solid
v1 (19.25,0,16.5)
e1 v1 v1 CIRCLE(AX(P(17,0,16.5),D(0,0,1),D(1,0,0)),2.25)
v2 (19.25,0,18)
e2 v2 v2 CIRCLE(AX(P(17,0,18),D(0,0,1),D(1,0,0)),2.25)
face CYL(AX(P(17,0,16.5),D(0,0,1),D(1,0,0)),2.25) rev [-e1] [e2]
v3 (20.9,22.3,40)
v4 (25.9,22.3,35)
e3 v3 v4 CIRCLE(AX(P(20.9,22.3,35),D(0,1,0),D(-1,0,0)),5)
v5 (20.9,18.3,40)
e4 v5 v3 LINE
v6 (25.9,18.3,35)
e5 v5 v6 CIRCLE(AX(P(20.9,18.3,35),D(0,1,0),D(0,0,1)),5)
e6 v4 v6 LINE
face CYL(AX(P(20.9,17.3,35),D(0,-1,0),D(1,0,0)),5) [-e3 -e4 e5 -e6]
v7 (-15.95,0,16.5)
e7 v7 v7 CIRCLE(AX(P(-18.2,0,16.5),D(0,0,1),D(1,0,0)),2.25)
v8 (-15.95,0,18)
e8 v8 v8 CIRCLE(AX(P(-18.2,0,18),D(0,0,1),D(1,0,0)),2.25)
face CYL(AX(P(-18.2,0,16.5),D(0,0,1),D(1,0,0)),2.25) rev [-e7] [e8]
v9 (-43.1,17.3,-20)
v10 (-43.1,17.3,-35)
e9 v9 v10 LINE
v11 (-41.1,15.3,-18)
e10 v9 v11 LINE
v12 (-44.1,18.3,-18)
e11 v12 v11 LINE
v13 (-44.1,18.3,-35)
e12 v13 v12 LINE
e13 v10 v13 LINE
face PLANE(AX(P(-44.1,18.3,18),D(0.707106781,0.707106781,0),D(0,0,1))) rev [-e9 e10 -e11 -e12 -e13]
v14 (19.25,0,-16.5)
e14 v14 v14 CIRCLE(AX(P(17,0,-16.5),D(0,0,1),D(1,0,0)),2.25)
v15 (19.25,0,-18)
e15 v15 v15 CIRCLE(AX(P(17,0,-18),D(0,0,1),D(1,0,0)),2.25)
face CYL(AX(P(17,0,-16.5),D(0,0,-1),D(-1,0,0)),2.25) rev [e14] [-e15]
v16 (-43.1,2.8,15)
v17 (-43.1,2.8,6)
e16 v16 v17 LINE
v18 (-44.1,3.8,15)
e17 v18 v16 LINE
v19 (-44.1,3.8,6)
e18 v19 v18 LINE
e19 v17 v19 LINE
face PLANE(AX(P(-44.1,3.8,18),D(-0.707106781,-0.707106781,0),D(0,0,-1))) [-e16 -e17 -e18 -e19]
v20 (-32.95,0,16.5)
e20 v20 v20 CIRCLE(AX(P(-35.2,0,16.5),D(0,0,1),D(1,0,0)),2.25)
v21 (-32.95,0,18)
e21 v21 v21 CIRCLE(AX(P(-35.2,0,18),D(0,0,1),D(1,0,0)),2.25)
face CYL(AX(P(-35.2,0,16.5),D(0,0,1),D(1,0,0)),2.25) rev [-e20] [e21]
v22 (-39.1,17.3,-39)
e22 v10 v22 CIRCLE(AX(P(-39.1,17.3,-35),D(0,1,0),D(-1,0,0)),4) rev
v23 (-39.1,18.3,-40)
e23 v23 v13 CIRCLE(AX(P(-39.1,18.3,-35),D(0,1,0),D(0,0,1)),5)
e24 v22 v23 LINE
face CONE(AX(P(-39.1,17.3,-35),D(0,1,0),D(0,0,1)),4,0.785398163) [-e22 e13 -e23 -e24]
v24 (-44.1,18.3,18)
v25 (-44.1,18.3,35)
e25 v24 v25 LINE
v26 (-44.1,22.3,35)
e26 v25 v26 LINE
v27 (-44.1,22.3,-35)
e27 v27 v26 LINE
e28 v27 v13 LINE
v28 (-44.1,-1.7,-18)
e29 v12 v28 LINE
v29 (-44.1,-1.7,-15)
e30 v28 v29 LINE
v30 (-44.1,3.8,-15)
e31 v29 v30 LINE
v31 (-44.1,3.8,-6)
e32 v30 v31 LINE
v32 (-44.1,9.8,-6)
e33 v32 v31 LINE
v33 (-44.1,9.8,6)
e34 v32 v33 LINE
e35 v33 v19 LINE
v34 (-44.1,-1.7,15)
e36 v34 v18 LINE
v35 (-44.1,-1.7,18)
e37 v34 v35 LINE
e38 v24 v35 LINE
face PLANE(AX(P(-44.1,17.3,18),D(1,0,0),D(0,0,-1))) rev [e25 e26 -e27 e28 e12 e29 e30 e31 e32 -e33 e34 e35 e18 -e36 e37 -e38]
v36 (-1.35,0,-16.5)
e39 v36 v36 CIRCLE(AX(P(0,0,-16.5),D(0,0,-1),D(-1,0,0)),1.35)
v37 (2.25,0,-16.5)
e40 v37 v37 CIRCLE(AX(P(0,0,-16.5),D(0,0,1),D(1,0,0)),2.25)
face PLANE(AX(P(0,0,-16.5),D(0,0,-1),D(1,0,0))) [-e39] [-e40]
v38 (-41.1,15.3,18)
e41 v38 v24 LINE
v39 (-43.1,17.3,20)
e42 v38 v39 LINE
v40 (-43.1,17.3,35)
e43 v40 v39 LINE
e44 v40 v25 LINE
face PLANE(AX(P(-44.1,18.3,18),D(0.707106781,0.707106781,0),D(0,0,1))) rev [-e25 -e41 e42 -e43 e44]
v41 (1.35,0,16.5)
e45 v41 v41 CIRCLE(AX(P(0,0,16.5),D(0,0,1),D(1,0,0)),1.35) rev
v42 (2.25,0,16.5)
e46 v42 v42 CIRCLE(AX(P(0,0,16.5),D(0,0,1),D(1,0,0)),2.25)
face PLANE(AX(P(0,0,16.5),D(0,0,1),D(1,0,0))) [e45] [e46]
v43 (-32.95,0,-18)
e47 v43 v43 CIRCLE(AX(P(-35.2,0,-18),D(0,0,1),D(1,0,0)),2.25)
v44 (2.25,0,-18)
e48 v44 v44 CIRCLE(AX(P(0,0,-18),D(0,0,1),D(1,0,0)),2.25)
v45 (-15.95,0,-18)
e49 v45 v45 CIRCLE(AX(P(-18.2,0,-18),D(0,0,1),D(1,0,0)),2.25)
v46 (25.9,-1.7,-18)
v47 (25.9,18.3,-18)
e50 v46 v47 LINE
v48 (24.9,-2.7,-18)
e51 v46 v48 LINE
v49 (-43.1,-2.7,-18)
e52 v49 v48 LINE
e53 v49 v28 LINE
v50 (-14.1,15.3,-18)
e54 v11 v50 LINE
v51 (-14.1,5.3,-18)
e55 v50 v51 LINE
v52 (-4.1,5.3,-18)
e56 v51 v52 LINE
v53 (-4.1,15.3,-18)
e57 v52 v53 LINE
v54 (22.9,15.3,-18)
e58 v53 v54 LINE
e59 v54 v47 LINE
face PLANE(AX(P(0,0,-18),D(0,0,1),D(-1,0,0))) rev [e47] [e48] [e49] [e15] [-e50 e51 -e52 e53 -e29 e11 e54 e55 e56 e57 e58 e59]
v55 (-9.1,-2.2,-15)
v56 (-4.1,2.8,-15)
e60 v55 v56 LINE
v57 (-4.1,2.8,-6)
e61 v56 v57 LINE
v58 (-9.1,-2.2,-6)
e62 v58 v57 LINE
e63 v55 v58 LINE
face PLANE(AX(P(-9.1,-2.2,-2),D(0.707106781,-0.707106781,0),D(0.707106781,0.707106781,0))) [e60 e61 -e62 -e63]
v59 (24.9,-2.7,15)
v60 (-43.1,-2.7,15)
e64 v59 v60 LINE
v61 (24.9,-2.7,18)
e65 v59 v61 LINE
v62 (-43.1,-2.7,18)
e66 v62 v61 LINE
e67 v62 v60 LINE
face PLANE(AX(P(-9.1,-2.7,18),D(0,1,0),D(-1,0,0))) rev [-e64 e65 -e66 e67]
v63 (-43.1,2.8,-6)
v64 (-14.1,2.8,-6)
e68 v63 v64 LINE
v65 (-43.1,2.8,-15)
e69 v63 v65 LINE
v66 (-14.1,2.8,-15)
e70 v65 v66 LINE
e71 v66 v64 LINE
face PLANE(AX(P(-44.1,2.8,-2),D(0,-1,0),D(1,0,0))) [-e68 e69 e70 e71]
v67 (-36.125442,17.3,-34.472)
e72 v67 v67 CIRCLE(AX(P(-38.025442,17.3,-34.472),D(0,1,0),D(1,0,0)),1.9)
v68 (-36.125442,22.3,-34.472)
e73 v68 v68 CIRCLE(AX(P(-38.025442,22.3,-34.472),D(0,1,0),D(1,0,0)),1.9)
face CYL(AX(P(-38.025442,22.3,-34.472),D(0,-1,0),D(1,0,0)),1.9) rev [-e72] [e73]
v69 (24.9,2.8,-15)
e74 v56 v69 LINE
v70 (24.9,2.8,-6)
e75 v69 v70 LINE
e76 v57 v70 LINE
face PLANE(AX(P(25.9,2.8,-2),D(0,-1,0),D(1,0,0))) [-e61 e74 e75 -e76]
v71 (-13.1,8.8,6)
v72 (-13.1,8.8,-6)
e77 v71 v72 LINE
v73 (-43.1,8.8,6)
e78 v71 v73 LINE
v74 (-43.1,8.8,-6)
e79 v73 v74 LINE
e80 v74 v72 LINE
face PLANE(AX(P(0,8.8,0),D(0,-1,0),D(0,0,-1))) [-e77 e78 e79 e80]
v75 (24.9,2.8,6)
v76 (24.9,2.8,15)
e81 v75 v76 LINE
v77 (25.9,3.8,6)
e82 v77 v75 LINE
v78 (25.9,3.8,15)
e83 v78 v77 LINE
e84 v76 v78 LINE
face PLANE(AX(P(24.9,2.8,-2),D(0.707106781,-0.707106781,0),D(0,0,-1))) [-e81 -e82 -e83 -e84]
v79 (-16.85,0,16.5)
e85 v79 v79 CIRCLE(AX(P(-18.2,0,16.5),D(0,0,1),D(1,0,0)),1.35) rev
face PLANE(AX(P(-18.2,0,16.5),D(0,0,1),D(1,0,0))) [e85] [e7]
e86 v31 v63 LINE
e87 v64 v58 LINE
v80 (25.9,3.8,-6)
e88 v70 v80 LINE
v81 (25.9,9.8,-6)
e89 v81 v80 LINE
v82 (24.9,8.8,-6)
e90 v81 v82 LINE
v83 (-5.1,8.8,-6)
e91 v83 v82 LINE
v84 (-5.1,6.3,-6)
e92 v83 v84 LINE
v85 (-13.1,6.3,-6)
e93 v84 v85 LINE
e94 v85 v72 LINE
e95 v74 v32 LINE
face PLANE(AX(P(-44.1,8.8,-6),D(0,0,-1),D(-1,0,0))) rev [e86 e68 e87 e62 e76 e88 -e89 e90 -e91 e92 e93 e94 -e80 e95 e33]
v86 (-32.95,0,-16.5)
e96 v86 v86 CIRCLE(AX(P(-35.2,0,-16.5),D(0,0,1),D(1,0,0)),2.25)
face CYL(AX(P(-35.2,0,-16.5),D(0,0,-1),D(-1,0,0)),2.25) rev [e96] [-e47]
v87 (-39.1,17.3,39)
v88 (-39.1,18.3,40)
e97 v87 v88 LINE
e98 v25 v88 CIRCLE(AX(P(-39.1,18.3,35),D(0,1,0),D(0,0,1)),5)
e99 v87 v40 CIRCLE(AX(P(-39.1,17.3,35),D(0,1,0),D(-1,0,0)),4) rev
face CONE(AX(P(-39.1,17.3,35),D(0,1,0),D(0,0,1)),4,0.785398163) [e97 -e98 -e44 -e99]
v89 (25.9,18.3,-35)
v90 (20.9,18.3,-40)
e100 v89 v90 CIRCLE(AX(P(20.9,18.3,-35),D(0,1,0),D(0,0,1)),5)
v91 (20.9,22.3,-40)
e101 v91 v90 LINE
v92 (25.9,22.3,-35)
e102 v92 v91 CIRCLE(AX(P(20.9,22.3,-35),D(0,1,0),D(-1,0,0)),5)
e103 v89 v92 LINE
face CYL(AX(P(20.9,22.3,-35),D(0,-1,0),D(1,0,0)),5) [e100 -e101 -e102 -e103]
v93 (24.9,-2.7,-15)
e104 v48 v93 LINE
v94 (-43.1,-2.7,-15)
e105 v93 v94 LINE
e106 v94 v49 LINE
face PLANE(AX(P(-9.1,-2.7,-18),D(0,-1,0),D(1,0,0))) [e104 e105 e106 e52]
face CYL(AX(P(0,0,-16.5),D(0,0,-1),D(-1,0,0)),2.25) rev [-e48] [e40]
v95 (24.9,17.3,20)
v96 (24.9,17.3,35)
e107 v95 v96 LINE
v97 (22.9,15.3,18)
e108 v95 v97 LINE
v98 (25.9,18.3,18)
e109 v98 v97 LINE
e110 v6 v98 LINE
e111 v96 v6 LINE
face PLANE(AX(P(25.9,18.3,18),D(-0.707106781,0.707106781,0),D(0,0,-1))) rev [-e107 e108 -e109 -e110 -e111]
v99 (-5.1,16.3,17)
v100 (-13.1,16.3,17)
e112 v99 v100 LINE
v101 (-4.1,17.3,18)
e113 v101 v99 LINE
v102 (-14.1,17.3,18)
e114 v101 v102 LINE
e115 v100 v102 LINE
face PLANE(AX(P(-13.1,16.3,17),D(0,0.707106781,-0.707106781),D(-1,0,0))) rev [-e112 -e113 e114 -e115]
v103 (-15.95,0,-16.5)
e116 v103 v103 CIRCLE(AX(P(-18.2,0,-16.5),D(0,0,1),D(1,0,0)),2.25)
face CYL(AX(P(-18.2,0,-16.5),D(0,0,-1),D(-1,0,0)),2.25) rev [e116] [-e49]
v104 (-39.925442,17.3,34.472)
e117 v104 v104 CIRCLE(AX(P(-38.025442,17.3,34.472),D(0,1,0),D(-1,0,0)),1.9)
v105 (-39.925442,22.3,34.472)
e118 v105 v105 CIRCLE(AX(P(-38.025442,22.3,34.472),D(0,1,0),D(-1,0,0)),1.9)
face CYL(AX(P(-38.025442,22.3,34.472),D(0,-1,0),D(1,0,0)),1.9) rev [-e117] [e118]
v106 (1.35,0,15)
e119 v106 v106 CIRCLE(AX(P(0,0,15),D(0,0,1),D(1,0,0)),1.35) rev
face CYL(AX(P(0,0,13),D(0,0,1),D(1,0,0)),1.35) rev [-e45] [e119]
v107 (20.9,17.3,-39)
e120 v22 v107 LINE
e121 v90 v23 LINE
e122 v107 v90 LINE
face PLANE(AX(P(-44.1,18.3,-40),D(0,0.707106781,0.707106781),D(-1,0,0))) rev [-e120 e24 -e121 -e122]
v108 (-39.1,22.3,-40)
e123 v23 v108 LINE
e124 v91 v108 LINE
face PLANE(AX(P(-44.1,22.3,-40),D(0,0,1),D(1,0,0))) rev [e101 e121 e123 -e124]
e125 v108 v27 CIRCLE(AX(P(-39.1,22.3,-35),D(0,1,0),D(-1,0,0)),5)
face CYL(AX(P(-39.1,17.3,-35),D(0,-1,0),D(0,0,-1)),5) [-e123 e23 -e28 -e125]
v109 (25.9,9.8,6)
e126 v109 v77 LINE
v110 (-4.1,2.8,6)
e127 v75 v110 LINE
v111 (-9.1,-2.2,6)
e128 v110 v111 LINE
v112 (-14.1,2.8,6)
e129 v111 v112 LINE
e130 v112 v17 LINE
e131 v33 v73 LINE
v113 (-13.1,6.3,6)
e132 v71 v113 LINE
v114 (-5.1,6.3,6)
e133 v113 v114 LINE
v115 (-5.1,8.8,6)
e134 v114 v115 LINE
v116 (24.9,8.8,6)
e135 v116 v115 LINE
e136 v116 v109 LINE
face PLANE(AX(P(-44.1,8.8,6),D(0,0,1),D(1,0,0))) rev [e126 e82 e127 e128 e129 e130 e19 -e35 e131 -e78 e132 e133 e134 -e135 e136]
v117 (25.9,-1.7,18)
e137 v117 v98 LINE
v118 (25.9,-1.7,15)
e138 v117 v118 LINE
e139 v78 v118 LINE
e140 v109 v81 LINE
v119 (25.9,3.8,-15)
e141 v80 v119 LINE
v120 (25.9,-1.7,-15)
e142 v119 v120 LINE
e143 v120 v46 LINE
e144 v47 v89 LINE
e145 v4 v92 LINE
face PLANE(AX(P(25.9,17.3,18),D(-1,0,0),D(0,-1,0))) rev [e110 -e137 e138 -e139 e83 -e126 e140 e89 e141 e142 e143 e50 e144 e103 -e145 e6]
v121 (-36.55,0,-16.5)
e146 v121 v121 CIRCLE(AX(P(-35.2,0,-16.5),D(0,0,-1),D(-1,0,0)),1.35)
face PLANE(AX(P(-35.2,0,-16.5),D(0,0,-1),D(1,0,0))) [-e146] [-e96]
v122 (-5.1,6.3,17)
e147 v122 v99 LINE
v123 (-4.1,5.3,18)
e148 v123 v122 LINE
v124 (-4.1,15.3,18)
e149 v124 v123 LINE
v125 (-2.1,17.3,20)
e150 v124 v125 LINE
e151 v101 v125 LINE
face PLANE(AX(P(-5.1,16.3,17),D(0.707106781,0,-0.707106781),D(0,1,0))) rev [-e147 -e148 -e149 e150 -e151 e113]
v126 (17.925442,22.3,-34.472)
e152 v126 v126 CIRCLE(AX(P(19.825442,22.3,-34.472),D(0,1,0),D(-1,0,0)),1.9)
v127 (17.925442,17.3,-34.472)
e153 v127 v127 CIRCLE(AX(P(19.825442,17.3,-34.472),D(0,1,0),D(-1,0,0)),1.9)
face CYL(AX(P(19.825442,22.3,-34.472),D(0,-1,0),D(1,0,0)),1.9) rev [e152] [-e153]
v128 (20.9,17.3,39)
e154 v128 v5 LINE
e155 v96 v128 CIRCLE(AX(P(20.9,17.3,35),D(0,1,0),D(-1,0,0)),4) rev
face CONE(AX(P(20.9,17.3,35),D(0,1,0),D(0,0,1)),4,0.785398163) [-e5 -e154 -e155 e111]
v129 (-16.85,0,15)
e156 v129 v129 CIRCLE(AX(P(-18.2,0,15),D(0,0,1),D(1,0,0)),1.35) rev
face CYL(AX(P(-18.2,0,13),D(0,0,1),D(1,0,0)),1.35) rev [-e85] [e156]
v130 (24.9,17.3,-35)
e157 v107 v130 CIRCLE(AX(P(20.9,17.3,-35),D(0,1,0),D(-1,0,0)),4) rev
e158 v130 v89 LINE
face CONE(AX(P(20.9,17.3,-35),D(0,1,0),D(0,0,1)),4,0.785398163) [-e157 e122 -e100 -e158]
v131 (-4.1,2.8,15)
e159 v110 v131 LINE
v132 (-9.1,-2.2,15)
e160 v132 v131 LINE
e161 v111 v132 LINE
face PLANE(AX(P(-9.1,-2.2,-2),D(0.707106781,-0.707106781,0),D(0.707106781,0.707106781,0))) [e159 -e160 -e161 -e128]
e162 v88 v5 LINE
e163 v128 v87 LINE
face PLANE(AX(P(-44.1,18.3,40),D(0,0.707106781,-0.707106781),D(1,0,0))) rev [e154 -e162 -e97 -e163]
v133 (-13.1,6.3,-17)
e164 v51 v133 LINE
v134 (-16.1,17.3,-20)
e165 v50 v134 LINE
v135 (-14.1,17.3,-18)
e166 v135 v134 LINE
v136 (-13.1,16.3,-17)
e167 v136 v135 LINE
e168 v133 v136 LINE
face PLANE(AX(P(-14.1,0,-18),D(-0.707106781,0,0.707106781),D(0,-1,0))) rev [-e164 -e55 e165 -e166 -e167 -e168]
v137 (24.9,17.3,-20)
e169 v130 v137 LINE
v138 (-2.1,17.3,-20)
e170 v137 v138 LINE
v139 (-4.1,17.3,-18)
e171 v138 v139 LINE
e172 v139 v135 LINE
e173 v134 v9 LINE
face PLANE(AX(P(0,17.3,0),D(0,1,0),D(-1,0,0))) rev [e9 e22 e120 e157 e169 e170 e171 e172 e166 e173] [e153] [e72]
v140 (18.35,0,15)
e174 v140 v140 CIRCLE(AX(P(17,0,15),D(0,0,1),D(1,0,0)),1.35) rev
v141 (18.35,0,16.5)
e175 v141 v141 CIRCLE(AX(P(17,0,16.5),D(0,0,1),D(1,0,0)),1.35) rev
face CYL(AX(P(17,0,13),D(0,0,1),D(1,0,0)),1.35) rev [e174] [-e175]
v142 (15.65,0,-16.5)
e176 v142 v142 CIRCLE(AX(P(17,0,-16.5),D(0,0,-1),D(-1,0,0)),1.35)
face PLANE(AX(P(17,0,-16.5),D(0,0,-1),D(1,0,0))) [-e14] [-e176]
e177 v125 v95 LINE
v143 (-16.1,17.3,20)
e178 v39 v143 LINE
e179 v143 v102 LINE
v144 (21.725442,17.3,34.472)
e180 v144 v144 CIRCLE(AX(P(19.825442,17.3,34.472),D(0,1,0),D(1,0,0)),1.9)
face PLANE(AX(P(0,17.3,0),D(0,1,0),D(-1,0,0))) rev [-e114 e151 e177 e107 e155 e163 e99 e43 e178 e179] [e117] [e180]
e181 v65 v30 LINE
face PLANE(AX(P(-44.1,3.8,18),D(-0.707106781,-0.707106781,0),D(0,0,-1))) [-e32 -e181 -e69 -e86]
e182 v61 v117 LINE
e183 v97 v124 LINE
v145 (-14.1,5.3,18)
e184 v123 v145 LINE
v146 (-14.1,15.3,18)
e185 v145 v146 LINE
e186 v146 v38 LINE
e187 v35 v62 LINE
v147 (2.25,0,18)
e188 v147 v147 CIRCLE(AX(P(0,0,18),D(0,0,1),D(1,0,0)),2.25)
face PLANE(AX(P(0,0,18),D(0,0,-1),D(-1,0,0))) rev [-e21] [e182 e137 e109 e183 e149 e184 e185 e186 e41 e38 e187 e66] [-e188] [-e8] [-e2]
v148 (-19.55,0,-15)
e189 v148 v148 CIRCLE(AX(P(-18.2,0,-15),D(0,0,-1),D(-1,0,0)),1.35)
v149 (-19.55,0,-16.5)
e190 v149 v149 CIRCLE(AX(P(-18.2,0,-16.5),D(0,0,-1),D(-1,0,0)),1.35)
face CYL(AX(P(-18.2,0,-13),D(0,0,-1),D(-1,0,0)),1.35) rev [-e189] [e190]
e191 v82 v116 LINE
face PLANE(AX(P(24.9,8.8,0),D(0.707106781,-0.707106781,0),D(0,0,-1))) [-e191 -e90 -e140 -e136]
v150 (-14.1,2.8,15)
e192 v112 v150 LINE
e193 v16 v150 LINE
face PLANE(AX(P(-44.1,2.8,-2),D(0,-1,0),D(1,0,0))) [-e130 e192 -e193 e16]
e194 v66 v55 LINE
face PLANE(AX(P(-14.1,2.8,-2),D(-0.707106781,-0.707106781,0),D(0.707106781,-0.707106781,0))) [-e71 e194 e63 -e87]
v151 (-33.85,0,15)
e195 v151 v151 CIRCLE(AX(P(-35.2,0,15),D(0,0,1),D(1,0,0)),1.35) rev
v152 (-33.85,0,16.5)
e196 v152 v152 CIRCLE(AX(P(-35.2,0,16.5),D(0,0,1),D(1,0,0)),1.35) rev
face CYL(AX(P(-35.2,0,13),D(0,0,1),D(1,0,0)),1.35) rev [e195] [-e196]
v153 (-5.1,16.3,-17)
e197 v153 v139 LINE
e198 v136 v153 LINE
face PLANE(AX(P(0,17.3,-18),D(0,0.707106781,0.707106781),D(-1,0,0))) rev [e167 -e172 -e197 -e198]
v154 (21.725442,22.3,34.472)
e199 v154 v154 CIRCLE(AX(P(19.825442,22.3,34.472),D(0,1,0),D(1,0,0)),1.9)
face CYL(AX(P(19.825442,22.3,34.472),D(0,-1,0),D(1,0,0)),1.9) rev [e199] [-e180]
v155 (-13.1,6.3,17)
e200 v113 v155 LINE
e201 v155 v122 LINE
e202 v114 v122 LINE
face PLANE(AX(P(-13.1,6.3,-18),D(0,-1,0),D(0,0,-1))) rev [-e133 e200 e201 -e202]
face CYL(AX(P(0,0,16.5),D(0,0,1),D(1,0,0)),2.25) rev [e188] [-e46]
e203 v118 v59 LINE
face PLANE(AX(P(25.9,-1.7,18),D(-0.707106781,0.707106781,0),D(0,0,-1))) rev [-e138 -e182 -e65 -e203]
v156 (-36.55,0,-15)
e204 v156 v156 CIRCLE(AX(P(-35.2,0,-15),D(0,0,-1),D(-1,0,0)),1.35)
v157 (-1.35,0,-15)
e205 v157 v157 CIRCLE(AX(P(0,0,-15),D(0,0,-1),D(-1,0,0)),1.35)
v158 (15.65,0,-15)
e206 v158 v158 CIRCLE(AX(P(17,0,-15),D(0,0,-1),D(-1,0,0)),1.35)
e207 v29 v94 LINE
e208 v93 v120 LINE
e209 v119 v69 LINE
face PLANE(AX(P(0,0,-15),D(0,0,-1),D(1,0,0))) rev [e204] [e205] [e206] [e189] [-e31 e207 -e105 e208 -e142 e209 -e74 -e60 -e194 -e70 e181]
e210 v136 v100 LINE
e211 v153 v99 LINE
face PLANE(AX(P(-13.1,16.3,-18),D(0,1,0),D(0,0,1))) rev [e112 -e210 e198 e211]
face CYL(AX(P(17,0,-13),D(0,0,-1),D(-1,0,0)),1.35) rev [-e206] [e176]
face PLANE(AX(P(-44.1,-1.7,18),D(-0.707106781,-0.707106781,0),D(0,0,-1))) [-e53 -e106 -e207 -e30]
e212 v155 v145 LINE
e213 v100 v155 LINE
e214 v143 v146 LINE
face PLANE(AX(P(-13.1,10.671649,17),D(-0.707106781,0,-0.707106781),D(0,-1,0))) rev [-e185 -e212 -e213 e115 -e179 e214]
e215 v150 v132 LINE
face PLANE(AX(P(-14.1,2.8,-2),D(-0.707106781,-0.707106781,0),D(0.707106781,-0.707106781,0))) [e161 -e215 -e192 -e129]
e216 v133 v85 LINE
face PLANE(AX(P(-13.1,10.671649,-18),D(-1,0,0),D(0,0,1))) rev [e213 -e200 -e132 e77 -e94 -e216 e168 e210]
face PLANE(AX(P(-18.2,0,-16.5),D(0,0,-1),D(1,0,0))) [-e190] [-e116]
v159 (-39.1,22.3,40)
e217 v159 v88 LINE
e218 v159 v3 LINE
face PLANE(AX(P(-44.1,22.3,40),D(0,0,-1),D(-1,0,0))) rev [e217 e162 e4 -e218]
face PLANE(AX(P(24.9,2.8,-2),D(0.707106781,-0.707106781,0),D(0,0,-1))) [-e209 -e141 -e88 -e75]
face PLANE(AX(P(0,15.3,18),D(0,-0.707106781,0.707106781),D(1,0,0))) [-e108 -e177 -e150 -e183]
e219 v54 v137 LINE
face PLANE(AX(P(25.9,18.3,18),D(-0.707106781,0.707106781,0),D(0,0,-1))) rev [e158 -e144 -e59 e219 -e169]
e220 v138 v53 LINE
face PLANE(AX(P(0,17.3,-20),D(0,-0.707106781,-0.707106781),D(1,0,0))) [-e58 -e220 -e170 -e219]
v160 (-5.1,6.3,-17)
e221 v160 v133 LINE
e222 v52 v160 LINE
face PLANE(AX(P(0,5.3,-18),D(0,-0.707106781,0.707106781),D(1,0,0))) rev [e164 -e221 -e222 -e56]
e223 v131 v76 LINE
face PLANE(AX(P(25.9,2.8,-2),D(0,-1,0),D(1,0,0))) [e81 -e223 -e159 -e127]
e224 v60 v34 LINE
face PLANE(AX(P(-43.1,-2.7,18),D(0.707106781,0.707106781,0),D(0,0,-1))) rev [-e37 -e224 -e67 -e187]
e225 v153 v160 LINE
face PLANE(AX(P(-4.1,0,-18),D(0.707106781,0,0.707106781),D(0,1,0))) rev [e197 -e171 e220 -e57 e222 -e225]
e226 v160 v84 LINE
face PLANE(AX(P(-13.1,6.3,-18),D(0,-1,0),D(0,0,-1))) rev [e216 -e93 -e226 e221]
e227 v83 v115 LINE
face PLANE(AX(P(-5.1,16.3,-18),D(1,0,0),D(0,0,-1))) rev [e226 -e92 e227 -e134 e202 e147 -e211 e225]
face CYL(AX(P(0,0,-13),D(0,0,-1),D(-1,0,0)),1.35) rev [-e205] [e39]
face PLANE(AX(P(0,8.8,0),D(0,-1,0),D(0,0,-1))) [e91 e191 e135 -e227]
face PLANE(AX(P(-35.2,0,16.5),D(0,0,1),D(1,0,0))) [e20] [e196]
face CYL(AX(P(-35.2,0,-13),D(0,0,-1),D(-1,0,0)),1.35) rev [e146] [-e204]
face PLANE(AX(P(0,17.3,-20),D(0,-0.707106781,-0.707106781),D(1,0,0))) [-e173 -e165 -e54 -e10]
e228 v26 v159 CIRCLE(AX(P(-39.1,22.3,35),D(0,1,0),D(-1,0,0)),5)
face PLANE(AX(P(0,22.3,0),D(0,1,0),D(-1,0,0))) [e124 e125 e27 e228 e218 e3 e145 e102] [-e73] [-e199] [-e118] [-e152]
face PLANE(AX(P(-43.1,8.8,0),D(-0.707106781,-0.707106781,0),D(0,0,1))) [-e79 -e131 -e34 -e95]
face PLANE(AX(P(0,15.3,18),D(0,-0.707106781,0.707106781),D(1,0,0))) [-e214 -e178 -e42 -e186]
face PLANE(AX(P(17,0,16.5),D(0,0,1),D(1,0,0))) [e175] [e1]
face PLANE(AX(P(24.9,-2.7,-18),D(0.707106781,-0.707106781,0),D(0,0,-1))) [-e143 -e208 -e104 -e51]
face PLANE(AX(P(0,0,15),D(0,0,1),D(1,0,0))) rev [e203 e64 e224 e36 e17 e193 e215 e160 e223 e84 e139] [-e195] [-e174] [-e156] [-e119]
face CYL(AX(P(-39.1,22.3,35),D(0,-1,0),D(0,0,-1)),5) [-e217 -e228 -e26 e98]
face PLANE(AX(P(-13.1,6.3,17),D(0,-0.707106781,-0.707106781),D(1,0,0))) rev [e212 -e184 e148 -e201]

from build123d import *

# Parameters (mm, degrees)
BOSS_EXTRUDE1_DEPTH        = 18
CROQUIS2_R                 = 1.35
CORTAR_EXTRUIR2_DEPTH      = 5
SKETCH3_R                  = 2.25
CUT_EXTRUDE1_DEPTH         = 1.5
CORTAR_EXTRUIR3_START      = 3
CORTAR_EXTRUIR3_DEPTH      = 17
CORTAR_EXTRUIR4_DEPTH      = 50.79015967
CORTAR_EXTRUIR4_DEPTH_BACK = 6
CROQUIS4_W                 = 70
CROQUIS4_H                 = 12
CORTAR_EXTRUIR11_DEPTH     = 60.498739482
CROQUIS6_W                 = 70
CROQUIS6_H                 = 80
CROQUIS6_R                 = 1.9
SALIENTE_EXTRUIR1_DEPTH    = 5
REDONDEO1_R                = 5
CHAFL_N1_SIZE              = 1
CHAFL_N2_SIZE              = 1
CHAFL_N3_SIZE              = 1
CHAFL_N5_SIZE              = 1
CHAFL_N6_SIZE              = 2


# Some blends are built 0.0001 mm under size
with BuildPart() as part:
    # Sketch1 → Boss-Extrude1 (new body)
    with BuildSketch(Plane.XY):
        Polygon((25.9, 17.3), (-9.1, 17.3), (-44.1, 17.3), (-44.1, -2.7), (-9.1, -2.7), (25.9, -2.7), (25.9, 2.5), align=None)
    boss_extrude1 = extrude(amount=BOSS_EXTRUDE1_DEPTH)

    # Croquis2 → Cortar-Extruir2 (cut)
    with BuildSketch(Plane.XY.offset(18)):
        Circle(CROQUIS2_R)
        with Locations((17, 0)):
            Circle(CROQUIS2_R)
        with Locations((-18.2, 0)):
            Circle(CROQUIS2_R)
        with Locations((-35.2, 0)):
            Circle(CROQUIS2_R)
    cortar_extruir2 = extrude(amount=-CORTAR_EXTRUIR2_DEPTH, mode=Mode.SUBTRACT)

    # Sketch3 → Cut-Extrude1 (cut)
    with BuildSketch(Plane.XY.offset(18)):
        Circle(SKETCH3_R)
        with Locations((17, 0)):
            Circle(SKETCH3_R)
        with Locations((-18.2, 0)):
            Circle(SKETCH3_R)
        with Locations((-35.2, 0)):
            Circle(SKETCH3_R)
    cut_extrude1 = extrude(amount=-CUT_EXTRUDE1_DEPTH, mode=Mode.SUBTRACT)

    # Croquis3 → Cortar-Extruir3 (cut)
    with BuildSketch(Plane(origin=(0, 0, 18), x_dir=(-1, 0, 0), z_dir=(0, 0, -1)).offset(CORTAR_EXTRUIR3_START)):
        Polygon((-25.9, -2.7), (-25.9, 2.8), (4.1, 2.8), (9.1, -2.2), (14.1, 2.8), (44.1, 2.8), (44.1, -2.7), align=None)
    cortar_extruir3 = extrude(amount=CORTAR_EXTRUIR3_DEPTH, mode=Mode.SUBTRACT)

    # Mirror1: Boss-Extrude1, Cortar-Extruir2, Cut-Extrude1, Cortar-Extruir3 across plane
    add(boss_extrude1.mirror(Plane(origin=(0, 0, 0), x_dir=(1, 0, 0), z_dir=(0, 0, -1))))
    add(cortar_extruir2.mirror(Plane(origin=(0, 0, 0), x_dir=(1, 0, 0), z_dir=(0, 0, -1))), mode=Mode.SUBTRACT)
    add(cut_extrude1.mirror(Plane(origin=(0, 0, 0), x_dir=(1, 0, 0), z_dir=(0, 0, -1))), mode=Mode.SUBTRACT)
    add(cortar_extruir3.mirror(Plane(origin=(0, 0, 0), x_dir=(1, 0, 0), z_dir=(0, 0, -1))), mode=Mode.SUBTRACT)

    # Croquis4 → Cortar-Extruir4 (cut, two sides: drawn at the far end of the back side and taken through both)
    with BuildSketch(Plane.XZ.offset(-2.8).offset(-CORTAR_EXTRUIR4_DEPTH_BACK)):
        with Locations((-9.1, 0)):
            Rectangle(CROQUIS4_W, CROQUIS4_H)
    extrude(amount=CORTAR_EXTRUIR4_DEPTH + CORTAR_EXTRUIR4_DEPTH_BACK, mode=Mode.SUBTRACT)

    # Croquis5 → Cortar-Extruir11 (cut, through all)
    with BuildSketch(Plane.XY.offset(18)):
        Polygon((-13.1, 10.671649133), (-13.1, 16.3), (-5.1, 16.3), (-5.1, 11.3), (-5.1, 6.3), (-13.1, 6.3), align=None)
    extrude(amount=-CORTAR_EXTRUIR11_DEPTH, mode=Mode.SUBTRACT)

    # Croquis6 → Saliente-Extruir1 (add)
    with BuildSketch(Plane(origin=(0, 17.3, 0), x_dir=(1, 0, 0), z_dir=(0, 1, 0))):
        with Locations((-9.1, 0)):
            Rectangle(CROQUIS6_W, CROQUIS6_H)
        with Locations(Location((-38.025442436, -34.47199994, 0), (0, 0, 180))):
            Circle(CROQUIS6_R, mode=Mode.SUBTRACT)
        with Locations((19.825442436, -34.47199994)):
            Circle(CROQUIS6_R, mode=Mode.SUBTRACT)
        with Locations(Location((19.825442436, 34.47199994, 0), (0, 0, 180))):
            Circle(CROQUIS6_R, mode=Mode.SUBTRACT)
        with Locations((-38.025442436, 34.47199994)):
            Circle(CROQUIS6_R, mode=Mode.SUBTRACT)
    extrude(amount=SALIENTE_EXTRUIR1_DEPTH)

    # Redondeo1
    redondeo1_edges = [part.edges().sort_by_distance(p)[0] for p in [
        (25.9, 19.8, 40),
        (25.9, 19.8, -40),
        (-44.1, 19.8, -40),
        (-44.1, 19.8, 40),
    ]]
    fillet(redondeo1_edges, radius=REDONDEO1_R)

    # Chaflán1
    chafl_n1_edges = [part.edges().sort_by_distance(p)[0] for p in [
        (-13.1, 11.3, 18),
        (-9.1, 6.3, 18),
        (-5.1, 11.3, 18),
        (-9.1, 16.3, 18),
    ]]
    chamfer(chafl_n1_edges, length=CHAFL_N1_SIZE - 0.0001)  # a hair under: the kernel refuses the full size

    # Chaflán2
    chafl_n2_edges = [part.edges().sort_by_distance(p)[0] for p in [
        (-9.1, 6.3, -18),
        (-13.1, 11.3, -18),
        (-5.1, 11.3, -18),
        (-9.1, 16.3, -18),
    ]]
    chamfer(chafl_n2_edges, length=CHAFL_N2_SIZE - 0.0001)  # a hair under: the kernel refuses the full size

    # Chaflán3
    chafl_n3_edges = [part.edges().sort_by_distance(p)[0] for p in [
        (25.9, 17.3, -26.5),
        (-44.1, 17.3, 26.5),
        (25.9, 17.3, 26.5),
        (-9.1, 17.3, 40),
        (-42.635533906, 17.3, 38.535533906),
        (24.435533906, 17.3, 38.535533906),
        (-44.1, 17.3, -26.5),
        (-9.1, 17.3, -40),
        (-42.635533906, 17.3, -38.535533906),
        (24.435533906, 17.3, -38.535533906),
    ]]
    chamfer(chafl_n3_edges, length=CHAFL_N3_SIZE)

    # Chaflán5
    chafl_n5_edges = [part.edges().sort_by_distance(p)[0] for p in [
        (25.9, -2.7, -16.5),
        (-44.1, -2.7, 16.5),
        (25.9, -2.7, 16.5),
        (25.9, 2.8, 10.5),
        (-44.1, 2.8, 10.5),
        (-44.1, 8.8, 0),
        (25.9, 8.8, 0),
        (-44.1, 2.8, -10.5),
        (25.9, 2.8, -10.5),
        (-44.1, -2.7, -16.5),
    ]]
    chamfer(chafl_n5_edges, length=CHAFL_N5_SIZE)

    # Chaflán6
    # the kernel refuses this chamfer: 2 mm, written as the material it adds along each edge
    with BuildSketch(Plane(origin=(-48.243365976, 17.3, 18), x_dir=(0, -0.9996219169112968, -0.027495876610585623), z_dir=(1, 0, 0))) as chafl_n6_piece_1_section:
        Polygon((CHAFL_N6_SIZE * 0.999621916911, -CHAFL_N6_SIZE * 0.0274958766106), (-CHAFL_N6_SIZE * 0.0274958766106, -CHAFL_N6_SIZE * 0.999621916911), (0, 0), align=None)
    chafl_n6_piece_1 = extrude(amount=78.286731952, mode=Mode.PRIVATE)
    chafl_n6_piece_1 = split(chafl_n6_piece_1, bisect_by=Plane(origin=(-21.681250309, 16.637349381, 25.581350309), z_dir=(-0.7071067811865476, 0, -0.7071067811865476)), keep=Keep.TOP, mode=Mode.PRIVATE)
    chafl_n6_piece_1 = split(chafl_n6_piece_1, bisect_by=Plane(origin=(-35.518649691, 9.718649691, 18.662650619), z_dir=(0.7071067811865476, 0.7071067811865476, 0)), keep=Keep.TOP, mode=Mode.PRIVATE)
    add(chafl_n6_piece_1)
    with BuildSketch(Plane(origin=(-48.243365976, 17.3, 18), x_dir=(0, -0.9996219169112968, -0.027495876610585623), z_dir=(1, 0, 0))) as chafl_n6_piece_2_section:
        Polygon((CHAFL_N6_SIZE * 0.999621916911, -CHAFL_N6_SIZE * 0.0274958766106), (-CHAFL_N6_SIZE * 0.0274958766106, -CHAFL_N6_SIZE * 0.999621916911), (0, 0), align=None)
    chafl_n6_piece_2 = extrude(amount=78.286731952, mode=Mode.PRIVATE)
    chafl_n6_piece_2 = split(chafl_n6_piece_2, bisect_by=Plane(origin=(17.318649691, 9.718649691, 18.662650619), z_dir=(-0.7071067811865476, 0.7071067811865476, 0)), keep=Keep.TOP, mode=Mode.PRIVATE)
    chafl_n6_piece_2 = split(chafl_n6_piece_2, bisect_by=Plane(origin=(3.481250309, 16.637349381, 25.581350309), z_dir=(0.7071067811865476, 0, -0.7071067811865476)), keep=Keep.TOP, mode=Mode.PRIVATE)
    add(chafl_n6_piece_2)
    with BuildSketch(Plane(origin=(-48.243365976, 17.3, -18), x_dir=(0, -0.9996219169112968, 0.027495876610585623), z_dir=(1, 0, 0))) as chafl_n6_piece_3_section:
        Polygon((CHAFL_N6_SIZE * 0.999621916911, CHAFL_N6_SIZE * 0.0274958766106), (-CHAFL_N6_SIZE * 0.0274958766106, CHAFL_N6_SIZE * 0.999621916911), (0, 0), align=None)
    chafl_n6_piece_3 = extrude(amount=78.286731952, mode=Mode.PRIVATE)
    chafl_n6_piece_3 = split(chafl_n6_piece_3, bisect_by=Plane(origin=(-21.681250309, 16.637349381, -25.581350309), z_dir=(-0.7071067811865476, 0, 0.7071067811865476)), keep=Keep.TOP, mode=Mode.PRIVATE)
    chafl_n6_piece_3 = split(chafl_n6_piece_3, bisect_by=Plane(origin=(-35.518649691, 9.718649691, -18.662650619), z_dir=(0.7071067811865476, 0.7071067811865476, 0)), keep=Keep.TOP, mode=Mode.PRIVATE)
    add(chafl_n6_piece_3)
    with BuildSketch(Plane(origin=(-48.243365976, 17.3, -18), x_dir=(0, -0.9996219169112968, 0.027495876610585623), z_dir=(1, 0, 0))) as chafl_n6_piece_4_section:
        Polygon((CHAFL_N6_SIZE * 0.999621916911, CHAFL_N6_SIZE * 0.0274958766106), (-CHAFL_N6_SIZE * 0.0274958766106, CHAFL_N6_SIZE * 0.999621916911), (0, 0), align=None)
    chafl_n6_piece_4 = extrude(amount=78.286731952, mode=Mode.PRIVATE)
    chafl_n6_piece_4 = split(chafl_n6_piece_4, bisect_by=Plane(origin=(3.481250309, 16.637349381, -25.581350309), z_dir=(0.7071067811865476, 0, 0.7071067811865476)), keep=Keep.TOP, mode=Mode.PRIVATE)
    chafl_n6_piece_4 = split(chafl_n6_piece_4, bisect_by=Plane(origin=(17.318649691, 9.718649691, -18.662650619), z_dir=(-0.7071067811865476, 0.7071067811865476, 0)), keep=Keep.TOP, mode=Mode.PRIVATE)
    add(chafl_n6_piece_4)


solid = part.part
